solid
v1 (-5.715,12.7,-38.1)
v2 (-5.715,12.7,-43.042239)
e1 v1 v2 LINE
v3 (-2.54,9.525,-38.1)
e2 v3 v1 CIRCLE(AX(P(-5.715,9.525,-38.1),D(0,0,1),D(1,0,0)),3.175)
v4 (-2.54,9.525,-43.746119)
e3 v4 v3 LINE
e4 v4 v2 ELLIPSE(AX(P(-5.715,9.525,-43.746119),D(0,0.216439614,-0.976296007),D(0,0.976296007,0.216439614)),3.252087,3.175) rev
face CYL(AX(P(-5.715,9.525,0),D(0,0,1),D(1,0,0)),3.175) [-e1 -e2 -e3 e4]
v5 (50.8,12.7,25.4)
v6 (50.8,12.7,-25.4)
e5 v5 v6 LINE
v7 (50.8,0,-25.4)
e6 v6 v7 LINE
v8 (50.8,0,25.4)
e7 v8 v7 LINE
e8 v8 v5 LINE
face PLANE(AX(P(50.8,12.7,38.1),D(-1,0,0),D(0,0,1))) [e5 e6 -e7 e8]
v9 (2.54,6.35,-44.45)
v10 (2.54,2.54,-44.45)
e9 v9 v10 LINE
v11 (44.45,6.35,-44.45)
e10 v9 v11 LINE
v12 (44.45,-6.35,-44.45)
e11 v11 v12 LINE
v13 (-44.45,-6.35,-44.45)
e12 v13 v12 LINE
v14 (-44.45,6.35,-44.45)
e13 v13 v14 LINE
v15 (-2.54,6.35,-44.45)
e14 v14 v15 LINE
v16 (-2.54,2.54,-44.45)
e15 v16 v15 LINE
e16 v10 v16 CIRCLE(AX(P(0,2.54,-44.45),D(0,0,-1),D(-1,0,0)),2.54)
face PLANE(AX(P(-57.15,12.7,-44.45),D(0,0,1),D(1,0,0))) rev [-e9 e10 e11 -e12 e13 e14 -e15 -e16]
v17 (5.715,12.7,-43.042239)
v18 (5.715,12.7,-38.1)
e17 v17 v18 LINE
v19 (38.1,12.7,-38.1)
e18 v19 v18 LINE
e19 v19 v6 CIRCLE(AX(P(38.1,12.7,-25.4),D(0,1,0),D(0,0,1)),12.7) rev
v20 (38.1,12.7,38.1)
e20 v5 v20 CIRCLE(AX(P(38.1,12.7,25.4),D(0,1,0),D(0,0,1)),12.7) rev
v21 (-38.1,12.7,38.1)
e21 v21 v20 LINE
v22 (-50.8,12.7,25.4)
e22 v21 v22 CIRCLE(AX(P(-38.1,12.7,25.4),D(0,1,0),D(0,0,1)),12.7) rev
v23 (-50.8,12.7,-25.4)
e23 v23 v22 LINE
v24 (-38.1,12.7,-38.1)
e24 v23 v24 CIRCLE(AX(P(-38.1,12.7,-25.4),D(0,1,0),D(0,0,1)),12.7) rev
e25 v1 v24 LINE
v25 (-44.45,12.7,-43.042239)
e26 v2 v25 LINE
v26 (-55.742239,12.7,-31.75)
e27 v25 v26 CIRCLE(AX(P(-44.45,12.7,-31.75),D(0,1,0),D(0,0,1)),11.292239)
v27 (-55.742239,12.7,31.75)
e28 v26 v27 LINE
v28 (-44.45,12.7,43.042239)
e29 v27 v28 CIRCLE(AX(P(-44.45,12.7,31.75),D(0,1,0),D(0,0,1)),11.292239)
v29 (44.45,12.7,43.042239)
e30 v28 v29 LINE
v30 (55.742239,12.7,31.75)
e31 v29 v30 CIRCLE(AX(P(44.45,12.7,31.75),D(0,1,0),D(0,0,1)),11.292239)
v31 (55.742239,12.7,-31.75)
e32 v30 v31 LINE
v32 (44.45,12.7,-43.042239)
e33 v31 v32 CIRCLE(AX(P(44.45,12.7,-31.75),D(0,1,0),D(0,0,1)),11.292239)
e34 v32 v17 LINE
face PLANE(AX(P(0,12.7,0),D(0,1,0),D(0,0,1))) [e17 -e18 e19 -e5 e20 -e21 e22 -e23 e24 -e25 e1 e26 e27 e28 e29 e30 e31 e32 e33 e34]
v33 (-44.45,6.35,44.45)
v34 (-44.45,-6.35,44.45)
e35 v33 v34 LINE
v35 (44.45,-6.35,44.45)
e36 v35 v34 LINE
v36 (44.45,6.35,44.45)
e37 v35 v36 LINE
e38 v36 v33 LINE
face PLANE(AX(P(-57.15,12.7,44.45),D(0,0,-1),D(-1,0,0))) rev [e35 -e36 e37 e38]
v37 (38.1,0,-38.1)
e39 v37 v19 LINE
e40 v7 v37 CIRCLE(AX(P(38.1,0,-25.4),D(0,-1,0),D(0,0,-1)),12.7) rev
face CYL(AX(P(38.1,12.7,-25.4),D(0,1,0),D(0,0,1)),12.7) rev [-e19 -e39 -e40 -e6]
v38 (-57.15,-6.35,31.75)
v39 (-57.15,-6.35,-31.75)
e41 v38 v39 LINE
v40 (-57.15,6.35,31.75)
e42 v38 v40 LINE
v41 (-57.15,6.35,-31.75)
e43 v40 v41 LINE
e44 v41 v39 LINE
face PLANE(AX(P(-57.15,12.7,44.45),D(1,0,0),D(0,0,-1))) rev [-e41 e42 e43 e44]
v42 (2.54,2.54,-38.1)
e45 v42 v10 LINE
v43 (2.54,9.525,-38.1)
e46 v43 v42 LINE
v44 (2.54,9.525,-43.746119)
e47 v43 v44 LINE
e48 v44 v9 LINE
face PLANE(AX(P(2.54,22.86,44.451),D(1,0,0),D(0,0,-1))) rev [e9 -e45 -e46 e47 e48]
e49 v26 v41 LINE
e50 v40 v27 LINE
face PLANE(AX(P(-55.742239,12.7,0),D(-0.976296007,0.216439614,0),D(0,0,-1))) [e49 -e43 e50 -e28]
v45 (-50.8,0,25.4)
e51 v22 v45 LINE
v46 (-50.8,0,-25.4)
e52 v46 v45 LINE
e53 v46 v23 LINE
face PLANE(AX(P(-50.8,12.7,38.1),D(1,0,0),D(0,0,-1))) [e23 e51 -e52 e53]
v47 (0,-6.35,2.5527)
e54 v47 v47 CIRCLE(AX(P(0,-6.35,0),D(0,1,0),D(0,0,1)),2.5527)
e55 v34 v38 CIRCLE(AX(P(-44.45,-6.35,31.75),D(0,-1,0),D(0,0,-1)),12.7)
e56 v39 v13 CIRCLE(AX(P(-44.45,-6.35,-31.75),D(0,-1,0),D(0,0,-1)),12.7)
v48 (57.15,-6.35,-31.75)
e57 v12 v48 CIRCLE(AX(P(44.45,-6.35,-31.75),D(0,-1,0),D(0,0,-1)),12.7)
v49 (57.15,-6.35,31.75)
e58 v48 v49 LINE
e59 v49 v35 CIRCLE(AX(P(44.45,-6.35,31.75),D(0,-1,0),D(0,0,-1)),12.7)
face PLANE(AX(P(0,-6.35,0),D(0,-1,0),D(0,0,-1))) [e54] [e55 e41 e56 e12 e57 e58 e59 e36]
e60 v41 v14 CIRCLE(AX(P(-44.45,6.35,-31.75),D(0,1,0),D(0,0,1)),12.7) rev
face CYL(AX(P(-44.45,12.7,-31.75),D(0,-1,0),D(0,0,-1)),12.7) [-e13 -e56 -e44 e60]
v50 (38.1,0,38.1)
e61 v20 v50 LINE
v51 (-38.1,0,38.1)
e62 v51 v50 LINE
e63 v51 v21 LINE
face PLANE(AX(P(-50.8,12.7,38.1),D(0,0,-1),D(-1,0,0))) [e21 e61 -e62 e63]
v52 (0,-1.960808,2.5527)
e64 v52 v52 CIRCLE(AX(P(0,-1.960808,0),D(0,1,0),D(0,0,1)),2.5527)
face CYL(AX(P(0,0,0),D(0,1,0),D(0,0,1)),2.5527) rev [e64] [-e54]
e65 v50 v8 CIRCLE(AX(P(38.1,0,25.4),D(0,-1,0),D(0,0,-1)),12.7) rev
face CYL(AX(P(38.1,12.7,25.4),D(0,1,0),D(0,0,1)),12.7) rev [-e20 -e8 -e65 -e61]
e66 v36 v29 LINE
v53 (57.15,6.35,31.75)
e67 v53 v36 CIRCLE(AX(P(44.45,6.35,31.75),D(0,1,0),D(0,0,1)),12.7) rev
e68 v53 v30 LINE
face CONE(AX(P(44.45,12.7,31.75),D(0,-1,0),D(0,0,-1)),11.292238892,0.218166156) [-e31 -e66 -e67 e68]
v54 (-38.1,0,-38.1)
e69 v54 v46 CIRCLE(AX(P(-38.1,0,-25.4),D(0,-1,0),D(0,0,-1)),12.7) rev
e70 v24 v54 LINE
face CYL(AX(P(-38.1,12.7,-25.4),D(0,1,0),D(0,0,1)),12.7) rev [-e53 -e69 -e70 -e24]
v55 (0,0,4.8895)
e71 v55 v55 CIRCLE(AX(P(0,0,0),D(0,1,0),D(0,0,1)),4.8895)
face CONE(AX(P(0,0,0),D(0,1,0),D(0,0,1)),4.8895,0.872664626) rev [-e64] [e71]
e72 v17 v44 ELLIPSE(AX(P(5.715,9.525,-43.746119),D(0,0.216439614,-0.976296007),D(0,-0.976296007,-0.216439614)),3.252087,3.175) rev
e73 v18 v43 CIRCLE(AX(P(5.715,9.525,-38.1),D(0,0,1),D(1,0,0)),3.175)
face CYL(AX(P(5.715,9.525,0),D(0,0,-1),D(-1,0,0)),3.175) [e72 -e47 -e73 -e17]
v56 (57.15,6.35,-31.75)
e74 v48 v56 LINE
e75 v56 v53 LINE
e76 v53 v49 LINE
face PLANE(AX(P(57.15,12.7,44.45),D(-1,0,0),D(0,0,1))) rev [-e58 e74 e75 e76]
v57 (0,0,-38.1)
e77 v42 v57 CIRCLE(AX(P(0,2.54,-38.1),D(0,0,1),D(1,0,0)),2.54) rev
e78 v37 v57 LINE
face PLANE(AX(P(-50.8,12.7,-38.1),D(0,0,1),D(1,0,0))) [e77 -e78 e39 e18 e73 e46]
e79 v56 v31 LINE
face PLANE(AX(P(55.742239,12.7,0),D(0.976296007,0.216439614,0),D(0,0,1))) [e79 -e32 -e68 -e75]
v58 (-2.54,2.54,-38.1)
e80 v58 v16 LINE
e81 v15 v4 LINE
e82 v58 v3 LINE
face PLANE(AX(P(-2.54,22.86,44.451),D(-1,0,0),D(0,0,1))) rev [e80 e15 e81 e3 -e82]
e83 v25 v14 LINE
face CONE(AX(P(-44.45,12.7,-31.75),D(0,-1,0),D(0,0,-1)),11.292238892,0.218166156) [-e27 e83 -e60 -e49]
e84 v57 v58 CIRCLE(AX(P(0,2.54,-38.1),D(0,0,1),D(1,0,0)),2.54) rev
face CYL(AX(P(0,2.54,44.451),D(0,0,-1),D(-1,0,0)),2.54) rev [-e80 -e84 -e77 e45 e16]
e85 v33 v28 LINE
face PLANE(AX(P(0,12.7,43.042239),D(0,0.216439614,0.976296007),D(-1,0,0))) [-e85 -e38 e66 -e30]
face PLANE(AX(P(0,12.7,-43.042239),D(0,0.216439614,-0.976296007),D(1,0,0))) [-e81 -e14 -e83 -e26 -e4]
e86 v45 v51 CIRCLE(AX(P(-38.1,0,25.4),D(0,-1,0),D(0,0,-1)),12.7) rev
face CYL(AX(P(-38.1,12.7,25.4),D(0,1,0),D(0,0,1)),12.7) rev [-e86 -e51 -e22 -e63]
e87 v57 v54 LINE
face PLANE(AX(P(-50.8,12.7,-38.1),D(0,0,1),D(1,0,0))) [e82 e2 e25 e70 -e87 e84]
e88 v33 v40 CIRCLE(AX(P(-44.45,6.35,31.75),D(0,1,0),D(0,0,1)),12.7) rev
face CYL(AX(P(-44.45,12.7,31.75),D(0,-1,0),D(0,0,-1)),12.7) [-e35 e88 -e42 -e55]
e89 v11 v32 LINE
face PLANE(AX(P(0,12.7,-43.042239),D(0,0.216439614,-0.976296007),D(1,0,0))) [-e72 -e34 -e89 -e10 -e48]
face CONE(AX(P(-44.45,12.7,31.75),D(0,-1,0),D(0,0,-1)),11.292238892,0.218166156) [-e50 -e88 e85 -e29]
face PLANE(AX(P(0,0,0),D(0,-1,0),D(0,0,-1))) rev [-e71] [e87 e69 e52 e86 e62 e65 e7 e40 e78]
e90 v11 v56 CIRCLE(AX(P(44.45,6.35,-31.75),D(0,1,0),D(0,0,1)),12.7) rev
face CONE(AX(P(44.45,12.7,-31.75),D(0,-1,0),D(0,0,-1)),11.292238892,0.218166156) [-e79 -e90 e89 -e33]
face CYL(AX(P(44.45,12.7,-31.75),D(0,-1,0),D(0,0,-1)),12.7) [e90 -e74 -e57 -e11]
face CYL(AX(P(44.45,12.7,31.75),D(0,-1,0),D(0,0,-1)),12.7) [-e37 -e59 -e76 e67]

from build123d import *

# Parameters (mm, degrees)
SKETCH1_W                                          = 114.3
SKETCH1_H                                          = 88.9
SKETCH1_W_2                                        = 101.6
SKETCH1_H_2                                        = 76.2
BOSS_EXTRUDE1_DEPTH                                = 12.7
SKETCH2_W                                          = 114.3
SKETCH2_H                                          = 88.9
BOSS_EXTRUDE2_DEPTH                                = 6.35
FILLET1_R                                          = 12.7
CUT_EXTRUDE1_REACH                                 = 108.445
FILLET2_R                                          = 3.175
CSK_FOR_10_FLAT_HEAD_MACHINE_SCREW_100_D           = 5.1054
CSK_FOR_10_FLAT_HEAD_MACHINE_SCREW_100_CSINK_D     = 9.779
CSK_FOR_10_FLAT_HEAD_MACHINE_SCREW_100_CSINK_ANGLE = 100
CHAMFER1_SIZE                                      = 1.407761108
CHAMFER1_SIZE_2                                    = 6.35


with BuildPart() as part:
    # Sketch1 → Boss-Extrude1 (new body)
    with BuildSketch(Plane(origin=(0, 0, 0), x_dir=(1, 0, 0), z_dir=(0, 1, 0))):
        Rectangle(SKETCH1_W, SKETCH1_H)
        Rectangle(SKETCH1_W_2, SKETCH1_H_2, mode=Mode.SUBTRACT)
    extrude(amount=BOSS_EXTRUDE1_DEPTH)

    # Sketch2 → Boss-Extrude2 (add)
    with BuildSketch(Plane.XZ):
        Rectangle(SKETCH2_W, SKETCH2_H)
    extrude(amount=BOSS_EXTRUDE2_DEPTH)

    # Fillet1
    fillet1_edges = [part.edges().sort_by_distance(p)[0] for p in [
        (50.8, 6.35, 38.1),
        (50.8, 6.35, -38.1),
        (-50.8, 6.35, -38.1),
        (-50.8, 6.35, 38.1),
        (-57.15, 3.175, 44.45),
        (-57.15, 3.175, -44.45),
        (57.15, 3.175, -44.45),
        (57.15, 3.175, 44.45),
    ]]
    fillet(fillet1_edges, radius=FILLET1_R)

    # Sketch3 → Cut-Extrude1 (cut, up to next)
    with BuildSketch(Plane(origin=(0, 0, -44.45), x_dir=(-1, 0, 0), z_dir=(0, 0, -1)), mode=Mode.PRIVATE) as cut_extrude1_sk1:
        with BuildLine():
            Line((2.54, 22.86), (2.54, 2.54))
            ThreePointArc((2.54, 2.54), (0, 0), (-2.54, 2.54))
            Line((-2.54, 2.54), (-2.54, 22.86))
            ThreePointArc((-2.54, 22.86), (0, 25.4), (2.54, 22.86))
        make_face()
    cut_extrude1_tool1 = extrude(cut_extrude1_sk1.sketch, amount=-CUT_EXTRUDE1_REACH, mode=Mode.PRIVATE) & part.part
    add(cut_extrude1_tool1.solids().sort_by_distance((0, 12.7, -44.45))[0], mode=Mode.SUBTRACT)

    # Fillet2
    fillet2_edges = [part.edges().sort_by_distance(p)[0] for p in [
        (2.54, 12.7, -41.275),
        (-2.54, 12.7, -41.275),
    ]]
    fillet(fillet2_edges, radius=FILLET2_R)

    # CSK for #10 Flat Head Machine Screw (100)1 (through all)
    with Locations(Plane(origin=(0, 0, 0), x_dir=(1, 0, 0), z_dir=(0, 1, 0))):
        with Locations((0, 0)):
            CounterSinkHole(CSK_FOR_10_FLAT_HEAD_MACHINE_SCREW_100_D / 2, CSK_FOR_10_FLAT_HEAD_MACHINE_SCREW_100_CSINK_D / 2, counter_sink_angle=CSK_FOR_10_FLAT_HEAD_MACHINE_SCREW_100_CSINK_ANGLE)

    # Chamfer1
    # the kernel refuses this chamfer: 6.35, 1.407761108 mm, written as the material it takes off along each edge
    with BuildSketch(Plane(origin=(-44.45, 12.7, -44.45), x_dir=(0, 0.16714603522124954, 0.9859321492424399), z_dir=(1, 0, 0)), Plane(origin=(-10.78052054, 12.7, -44.45), x_dir=(0, 0.16714603522124954, 0.9859321492424399), z_dir=(1, 0, 0))) as chamfer1_piece_1:
        Polygon((CHAMFER1_SIZE * 0.98593214909, CHAMFER1_SIZE * 0.167146035195), (-CHAMFER1_SIZE_2 * 0.167146035221, CHAMFER1_SIZE_2 * 0.985932149242), (0, 0), align=None)
    extrude(amount=55.23052054, mode=Mode.SUBTRACT)
    with BuildSketch(Plane(origin=(57.15, 12.7, -31.75), x_dir=(-0.9859321492424399, 0.16714603522124954, 0), z_dir=(0, 0, 1)), Plane(origin=(-57.15, 12.7, 31.75), x_dir=(0.9859321492424399, 0.16714603522124954, 0), z_dir=(0, 0, -1))) as chamfer1_piece_2:
        Polygon((CHAMFER1_SIZE * 0.98593214909, CHAMFER1_SIZE * 0.167146035195), (-CHAMFER1_SIZE_2 * 0.167146035221, CHAMFER1_SIZE_2 * 0.985932149242), (0, 0), align=None)
    extrude(amount=63.5, mode=Mode.SUBTRACT)
    with BuildSketch(Plane(origin=(44.45, 12.7, 44.45), x_dir=(0, 0.16714603522124954, -0.9859321492424399), z_dir=(-1, 0, 0))) as chamfer1_piece_3:
        Polygon((CHAMFER1_SIZE * 0.98593214909, CHAMFER1_SIZE * 0.167146035195), (-CHAMFER1_SIZE_2 * 0.167146035221, CHAMFER1_SIZE_2 * 0.985932149242), (0, 0), align=None)
    extrude(amount=88.9, mode=Mode.SUBTRACT)
    with BuildSketch(Plane(origin=(44.45, 12.7, -31.75), x_dir=(1, 0, 0), z_dir=(0, 0, 1))) as chamfer1_piece_4:
        Polygon((12.7 - CHAMFER1_SIZE, 0), (12.7, -CHAMFER1_SIZE_2), (12.7, 0), align=None)
    revolve(axis=Axis((44.45, 12.7, -31.75), (0, 1, 0)), revolution_arc=90, mode=Mode.SUBTRACT)
    with BuildSketch(Plane(origin=(-44.45, 12.7, -31.75), x_dir=(-1, 0, 0), z_dir=(0, 0, 1))) as chamfer1_piece_5:
        Polygon((12.7 - CHAMFER1_SIZE, 0), (12.7, CHAMFER1_SIZE_2), (12.7, 0), align=None)
    revolve(axis=Axis((-44.45, 12.7, -31.75), (0, -1, 0)), revolution_arc=90, mode=Mode.SUBTRACT)
    with BuildSketch(Plane(origin=(-44.45, 12.7, 31.75), x_dir=(-1, 0, 0), z_dir=(0, 0, -1))) as chamfer1_piece_6:
        Polygon((12.7 - CHAMFER1_SIZE, 0), (12.7, -CHAMFER1_SIZE_2), (12.7, 0), align=None)
    revolve(axis=Axis((-44.45, 12.7, 31.75), (0, 1, 0)), revolution_arc=90, mode=Mode.SUBTRACT)
    with BuildSketch(Plane(origin=(44.45, 12.7, 31.75), x_dir=(0, 0, 1), z_dir=(-1, 0, 0))) as chamfer1_piece_7:
        Polygon((12.7 - CHAMFER1_SIZE, 0), (12.7, -CHAMFER1_SIZE_2), (12.7, 0), align=None)
    revolve(axis=Axis((44.45, 12.7, 31.75), (0, 1, 0)), revolution_arc=90, mode=Mode.SUBTRACT)


solid = part.part
